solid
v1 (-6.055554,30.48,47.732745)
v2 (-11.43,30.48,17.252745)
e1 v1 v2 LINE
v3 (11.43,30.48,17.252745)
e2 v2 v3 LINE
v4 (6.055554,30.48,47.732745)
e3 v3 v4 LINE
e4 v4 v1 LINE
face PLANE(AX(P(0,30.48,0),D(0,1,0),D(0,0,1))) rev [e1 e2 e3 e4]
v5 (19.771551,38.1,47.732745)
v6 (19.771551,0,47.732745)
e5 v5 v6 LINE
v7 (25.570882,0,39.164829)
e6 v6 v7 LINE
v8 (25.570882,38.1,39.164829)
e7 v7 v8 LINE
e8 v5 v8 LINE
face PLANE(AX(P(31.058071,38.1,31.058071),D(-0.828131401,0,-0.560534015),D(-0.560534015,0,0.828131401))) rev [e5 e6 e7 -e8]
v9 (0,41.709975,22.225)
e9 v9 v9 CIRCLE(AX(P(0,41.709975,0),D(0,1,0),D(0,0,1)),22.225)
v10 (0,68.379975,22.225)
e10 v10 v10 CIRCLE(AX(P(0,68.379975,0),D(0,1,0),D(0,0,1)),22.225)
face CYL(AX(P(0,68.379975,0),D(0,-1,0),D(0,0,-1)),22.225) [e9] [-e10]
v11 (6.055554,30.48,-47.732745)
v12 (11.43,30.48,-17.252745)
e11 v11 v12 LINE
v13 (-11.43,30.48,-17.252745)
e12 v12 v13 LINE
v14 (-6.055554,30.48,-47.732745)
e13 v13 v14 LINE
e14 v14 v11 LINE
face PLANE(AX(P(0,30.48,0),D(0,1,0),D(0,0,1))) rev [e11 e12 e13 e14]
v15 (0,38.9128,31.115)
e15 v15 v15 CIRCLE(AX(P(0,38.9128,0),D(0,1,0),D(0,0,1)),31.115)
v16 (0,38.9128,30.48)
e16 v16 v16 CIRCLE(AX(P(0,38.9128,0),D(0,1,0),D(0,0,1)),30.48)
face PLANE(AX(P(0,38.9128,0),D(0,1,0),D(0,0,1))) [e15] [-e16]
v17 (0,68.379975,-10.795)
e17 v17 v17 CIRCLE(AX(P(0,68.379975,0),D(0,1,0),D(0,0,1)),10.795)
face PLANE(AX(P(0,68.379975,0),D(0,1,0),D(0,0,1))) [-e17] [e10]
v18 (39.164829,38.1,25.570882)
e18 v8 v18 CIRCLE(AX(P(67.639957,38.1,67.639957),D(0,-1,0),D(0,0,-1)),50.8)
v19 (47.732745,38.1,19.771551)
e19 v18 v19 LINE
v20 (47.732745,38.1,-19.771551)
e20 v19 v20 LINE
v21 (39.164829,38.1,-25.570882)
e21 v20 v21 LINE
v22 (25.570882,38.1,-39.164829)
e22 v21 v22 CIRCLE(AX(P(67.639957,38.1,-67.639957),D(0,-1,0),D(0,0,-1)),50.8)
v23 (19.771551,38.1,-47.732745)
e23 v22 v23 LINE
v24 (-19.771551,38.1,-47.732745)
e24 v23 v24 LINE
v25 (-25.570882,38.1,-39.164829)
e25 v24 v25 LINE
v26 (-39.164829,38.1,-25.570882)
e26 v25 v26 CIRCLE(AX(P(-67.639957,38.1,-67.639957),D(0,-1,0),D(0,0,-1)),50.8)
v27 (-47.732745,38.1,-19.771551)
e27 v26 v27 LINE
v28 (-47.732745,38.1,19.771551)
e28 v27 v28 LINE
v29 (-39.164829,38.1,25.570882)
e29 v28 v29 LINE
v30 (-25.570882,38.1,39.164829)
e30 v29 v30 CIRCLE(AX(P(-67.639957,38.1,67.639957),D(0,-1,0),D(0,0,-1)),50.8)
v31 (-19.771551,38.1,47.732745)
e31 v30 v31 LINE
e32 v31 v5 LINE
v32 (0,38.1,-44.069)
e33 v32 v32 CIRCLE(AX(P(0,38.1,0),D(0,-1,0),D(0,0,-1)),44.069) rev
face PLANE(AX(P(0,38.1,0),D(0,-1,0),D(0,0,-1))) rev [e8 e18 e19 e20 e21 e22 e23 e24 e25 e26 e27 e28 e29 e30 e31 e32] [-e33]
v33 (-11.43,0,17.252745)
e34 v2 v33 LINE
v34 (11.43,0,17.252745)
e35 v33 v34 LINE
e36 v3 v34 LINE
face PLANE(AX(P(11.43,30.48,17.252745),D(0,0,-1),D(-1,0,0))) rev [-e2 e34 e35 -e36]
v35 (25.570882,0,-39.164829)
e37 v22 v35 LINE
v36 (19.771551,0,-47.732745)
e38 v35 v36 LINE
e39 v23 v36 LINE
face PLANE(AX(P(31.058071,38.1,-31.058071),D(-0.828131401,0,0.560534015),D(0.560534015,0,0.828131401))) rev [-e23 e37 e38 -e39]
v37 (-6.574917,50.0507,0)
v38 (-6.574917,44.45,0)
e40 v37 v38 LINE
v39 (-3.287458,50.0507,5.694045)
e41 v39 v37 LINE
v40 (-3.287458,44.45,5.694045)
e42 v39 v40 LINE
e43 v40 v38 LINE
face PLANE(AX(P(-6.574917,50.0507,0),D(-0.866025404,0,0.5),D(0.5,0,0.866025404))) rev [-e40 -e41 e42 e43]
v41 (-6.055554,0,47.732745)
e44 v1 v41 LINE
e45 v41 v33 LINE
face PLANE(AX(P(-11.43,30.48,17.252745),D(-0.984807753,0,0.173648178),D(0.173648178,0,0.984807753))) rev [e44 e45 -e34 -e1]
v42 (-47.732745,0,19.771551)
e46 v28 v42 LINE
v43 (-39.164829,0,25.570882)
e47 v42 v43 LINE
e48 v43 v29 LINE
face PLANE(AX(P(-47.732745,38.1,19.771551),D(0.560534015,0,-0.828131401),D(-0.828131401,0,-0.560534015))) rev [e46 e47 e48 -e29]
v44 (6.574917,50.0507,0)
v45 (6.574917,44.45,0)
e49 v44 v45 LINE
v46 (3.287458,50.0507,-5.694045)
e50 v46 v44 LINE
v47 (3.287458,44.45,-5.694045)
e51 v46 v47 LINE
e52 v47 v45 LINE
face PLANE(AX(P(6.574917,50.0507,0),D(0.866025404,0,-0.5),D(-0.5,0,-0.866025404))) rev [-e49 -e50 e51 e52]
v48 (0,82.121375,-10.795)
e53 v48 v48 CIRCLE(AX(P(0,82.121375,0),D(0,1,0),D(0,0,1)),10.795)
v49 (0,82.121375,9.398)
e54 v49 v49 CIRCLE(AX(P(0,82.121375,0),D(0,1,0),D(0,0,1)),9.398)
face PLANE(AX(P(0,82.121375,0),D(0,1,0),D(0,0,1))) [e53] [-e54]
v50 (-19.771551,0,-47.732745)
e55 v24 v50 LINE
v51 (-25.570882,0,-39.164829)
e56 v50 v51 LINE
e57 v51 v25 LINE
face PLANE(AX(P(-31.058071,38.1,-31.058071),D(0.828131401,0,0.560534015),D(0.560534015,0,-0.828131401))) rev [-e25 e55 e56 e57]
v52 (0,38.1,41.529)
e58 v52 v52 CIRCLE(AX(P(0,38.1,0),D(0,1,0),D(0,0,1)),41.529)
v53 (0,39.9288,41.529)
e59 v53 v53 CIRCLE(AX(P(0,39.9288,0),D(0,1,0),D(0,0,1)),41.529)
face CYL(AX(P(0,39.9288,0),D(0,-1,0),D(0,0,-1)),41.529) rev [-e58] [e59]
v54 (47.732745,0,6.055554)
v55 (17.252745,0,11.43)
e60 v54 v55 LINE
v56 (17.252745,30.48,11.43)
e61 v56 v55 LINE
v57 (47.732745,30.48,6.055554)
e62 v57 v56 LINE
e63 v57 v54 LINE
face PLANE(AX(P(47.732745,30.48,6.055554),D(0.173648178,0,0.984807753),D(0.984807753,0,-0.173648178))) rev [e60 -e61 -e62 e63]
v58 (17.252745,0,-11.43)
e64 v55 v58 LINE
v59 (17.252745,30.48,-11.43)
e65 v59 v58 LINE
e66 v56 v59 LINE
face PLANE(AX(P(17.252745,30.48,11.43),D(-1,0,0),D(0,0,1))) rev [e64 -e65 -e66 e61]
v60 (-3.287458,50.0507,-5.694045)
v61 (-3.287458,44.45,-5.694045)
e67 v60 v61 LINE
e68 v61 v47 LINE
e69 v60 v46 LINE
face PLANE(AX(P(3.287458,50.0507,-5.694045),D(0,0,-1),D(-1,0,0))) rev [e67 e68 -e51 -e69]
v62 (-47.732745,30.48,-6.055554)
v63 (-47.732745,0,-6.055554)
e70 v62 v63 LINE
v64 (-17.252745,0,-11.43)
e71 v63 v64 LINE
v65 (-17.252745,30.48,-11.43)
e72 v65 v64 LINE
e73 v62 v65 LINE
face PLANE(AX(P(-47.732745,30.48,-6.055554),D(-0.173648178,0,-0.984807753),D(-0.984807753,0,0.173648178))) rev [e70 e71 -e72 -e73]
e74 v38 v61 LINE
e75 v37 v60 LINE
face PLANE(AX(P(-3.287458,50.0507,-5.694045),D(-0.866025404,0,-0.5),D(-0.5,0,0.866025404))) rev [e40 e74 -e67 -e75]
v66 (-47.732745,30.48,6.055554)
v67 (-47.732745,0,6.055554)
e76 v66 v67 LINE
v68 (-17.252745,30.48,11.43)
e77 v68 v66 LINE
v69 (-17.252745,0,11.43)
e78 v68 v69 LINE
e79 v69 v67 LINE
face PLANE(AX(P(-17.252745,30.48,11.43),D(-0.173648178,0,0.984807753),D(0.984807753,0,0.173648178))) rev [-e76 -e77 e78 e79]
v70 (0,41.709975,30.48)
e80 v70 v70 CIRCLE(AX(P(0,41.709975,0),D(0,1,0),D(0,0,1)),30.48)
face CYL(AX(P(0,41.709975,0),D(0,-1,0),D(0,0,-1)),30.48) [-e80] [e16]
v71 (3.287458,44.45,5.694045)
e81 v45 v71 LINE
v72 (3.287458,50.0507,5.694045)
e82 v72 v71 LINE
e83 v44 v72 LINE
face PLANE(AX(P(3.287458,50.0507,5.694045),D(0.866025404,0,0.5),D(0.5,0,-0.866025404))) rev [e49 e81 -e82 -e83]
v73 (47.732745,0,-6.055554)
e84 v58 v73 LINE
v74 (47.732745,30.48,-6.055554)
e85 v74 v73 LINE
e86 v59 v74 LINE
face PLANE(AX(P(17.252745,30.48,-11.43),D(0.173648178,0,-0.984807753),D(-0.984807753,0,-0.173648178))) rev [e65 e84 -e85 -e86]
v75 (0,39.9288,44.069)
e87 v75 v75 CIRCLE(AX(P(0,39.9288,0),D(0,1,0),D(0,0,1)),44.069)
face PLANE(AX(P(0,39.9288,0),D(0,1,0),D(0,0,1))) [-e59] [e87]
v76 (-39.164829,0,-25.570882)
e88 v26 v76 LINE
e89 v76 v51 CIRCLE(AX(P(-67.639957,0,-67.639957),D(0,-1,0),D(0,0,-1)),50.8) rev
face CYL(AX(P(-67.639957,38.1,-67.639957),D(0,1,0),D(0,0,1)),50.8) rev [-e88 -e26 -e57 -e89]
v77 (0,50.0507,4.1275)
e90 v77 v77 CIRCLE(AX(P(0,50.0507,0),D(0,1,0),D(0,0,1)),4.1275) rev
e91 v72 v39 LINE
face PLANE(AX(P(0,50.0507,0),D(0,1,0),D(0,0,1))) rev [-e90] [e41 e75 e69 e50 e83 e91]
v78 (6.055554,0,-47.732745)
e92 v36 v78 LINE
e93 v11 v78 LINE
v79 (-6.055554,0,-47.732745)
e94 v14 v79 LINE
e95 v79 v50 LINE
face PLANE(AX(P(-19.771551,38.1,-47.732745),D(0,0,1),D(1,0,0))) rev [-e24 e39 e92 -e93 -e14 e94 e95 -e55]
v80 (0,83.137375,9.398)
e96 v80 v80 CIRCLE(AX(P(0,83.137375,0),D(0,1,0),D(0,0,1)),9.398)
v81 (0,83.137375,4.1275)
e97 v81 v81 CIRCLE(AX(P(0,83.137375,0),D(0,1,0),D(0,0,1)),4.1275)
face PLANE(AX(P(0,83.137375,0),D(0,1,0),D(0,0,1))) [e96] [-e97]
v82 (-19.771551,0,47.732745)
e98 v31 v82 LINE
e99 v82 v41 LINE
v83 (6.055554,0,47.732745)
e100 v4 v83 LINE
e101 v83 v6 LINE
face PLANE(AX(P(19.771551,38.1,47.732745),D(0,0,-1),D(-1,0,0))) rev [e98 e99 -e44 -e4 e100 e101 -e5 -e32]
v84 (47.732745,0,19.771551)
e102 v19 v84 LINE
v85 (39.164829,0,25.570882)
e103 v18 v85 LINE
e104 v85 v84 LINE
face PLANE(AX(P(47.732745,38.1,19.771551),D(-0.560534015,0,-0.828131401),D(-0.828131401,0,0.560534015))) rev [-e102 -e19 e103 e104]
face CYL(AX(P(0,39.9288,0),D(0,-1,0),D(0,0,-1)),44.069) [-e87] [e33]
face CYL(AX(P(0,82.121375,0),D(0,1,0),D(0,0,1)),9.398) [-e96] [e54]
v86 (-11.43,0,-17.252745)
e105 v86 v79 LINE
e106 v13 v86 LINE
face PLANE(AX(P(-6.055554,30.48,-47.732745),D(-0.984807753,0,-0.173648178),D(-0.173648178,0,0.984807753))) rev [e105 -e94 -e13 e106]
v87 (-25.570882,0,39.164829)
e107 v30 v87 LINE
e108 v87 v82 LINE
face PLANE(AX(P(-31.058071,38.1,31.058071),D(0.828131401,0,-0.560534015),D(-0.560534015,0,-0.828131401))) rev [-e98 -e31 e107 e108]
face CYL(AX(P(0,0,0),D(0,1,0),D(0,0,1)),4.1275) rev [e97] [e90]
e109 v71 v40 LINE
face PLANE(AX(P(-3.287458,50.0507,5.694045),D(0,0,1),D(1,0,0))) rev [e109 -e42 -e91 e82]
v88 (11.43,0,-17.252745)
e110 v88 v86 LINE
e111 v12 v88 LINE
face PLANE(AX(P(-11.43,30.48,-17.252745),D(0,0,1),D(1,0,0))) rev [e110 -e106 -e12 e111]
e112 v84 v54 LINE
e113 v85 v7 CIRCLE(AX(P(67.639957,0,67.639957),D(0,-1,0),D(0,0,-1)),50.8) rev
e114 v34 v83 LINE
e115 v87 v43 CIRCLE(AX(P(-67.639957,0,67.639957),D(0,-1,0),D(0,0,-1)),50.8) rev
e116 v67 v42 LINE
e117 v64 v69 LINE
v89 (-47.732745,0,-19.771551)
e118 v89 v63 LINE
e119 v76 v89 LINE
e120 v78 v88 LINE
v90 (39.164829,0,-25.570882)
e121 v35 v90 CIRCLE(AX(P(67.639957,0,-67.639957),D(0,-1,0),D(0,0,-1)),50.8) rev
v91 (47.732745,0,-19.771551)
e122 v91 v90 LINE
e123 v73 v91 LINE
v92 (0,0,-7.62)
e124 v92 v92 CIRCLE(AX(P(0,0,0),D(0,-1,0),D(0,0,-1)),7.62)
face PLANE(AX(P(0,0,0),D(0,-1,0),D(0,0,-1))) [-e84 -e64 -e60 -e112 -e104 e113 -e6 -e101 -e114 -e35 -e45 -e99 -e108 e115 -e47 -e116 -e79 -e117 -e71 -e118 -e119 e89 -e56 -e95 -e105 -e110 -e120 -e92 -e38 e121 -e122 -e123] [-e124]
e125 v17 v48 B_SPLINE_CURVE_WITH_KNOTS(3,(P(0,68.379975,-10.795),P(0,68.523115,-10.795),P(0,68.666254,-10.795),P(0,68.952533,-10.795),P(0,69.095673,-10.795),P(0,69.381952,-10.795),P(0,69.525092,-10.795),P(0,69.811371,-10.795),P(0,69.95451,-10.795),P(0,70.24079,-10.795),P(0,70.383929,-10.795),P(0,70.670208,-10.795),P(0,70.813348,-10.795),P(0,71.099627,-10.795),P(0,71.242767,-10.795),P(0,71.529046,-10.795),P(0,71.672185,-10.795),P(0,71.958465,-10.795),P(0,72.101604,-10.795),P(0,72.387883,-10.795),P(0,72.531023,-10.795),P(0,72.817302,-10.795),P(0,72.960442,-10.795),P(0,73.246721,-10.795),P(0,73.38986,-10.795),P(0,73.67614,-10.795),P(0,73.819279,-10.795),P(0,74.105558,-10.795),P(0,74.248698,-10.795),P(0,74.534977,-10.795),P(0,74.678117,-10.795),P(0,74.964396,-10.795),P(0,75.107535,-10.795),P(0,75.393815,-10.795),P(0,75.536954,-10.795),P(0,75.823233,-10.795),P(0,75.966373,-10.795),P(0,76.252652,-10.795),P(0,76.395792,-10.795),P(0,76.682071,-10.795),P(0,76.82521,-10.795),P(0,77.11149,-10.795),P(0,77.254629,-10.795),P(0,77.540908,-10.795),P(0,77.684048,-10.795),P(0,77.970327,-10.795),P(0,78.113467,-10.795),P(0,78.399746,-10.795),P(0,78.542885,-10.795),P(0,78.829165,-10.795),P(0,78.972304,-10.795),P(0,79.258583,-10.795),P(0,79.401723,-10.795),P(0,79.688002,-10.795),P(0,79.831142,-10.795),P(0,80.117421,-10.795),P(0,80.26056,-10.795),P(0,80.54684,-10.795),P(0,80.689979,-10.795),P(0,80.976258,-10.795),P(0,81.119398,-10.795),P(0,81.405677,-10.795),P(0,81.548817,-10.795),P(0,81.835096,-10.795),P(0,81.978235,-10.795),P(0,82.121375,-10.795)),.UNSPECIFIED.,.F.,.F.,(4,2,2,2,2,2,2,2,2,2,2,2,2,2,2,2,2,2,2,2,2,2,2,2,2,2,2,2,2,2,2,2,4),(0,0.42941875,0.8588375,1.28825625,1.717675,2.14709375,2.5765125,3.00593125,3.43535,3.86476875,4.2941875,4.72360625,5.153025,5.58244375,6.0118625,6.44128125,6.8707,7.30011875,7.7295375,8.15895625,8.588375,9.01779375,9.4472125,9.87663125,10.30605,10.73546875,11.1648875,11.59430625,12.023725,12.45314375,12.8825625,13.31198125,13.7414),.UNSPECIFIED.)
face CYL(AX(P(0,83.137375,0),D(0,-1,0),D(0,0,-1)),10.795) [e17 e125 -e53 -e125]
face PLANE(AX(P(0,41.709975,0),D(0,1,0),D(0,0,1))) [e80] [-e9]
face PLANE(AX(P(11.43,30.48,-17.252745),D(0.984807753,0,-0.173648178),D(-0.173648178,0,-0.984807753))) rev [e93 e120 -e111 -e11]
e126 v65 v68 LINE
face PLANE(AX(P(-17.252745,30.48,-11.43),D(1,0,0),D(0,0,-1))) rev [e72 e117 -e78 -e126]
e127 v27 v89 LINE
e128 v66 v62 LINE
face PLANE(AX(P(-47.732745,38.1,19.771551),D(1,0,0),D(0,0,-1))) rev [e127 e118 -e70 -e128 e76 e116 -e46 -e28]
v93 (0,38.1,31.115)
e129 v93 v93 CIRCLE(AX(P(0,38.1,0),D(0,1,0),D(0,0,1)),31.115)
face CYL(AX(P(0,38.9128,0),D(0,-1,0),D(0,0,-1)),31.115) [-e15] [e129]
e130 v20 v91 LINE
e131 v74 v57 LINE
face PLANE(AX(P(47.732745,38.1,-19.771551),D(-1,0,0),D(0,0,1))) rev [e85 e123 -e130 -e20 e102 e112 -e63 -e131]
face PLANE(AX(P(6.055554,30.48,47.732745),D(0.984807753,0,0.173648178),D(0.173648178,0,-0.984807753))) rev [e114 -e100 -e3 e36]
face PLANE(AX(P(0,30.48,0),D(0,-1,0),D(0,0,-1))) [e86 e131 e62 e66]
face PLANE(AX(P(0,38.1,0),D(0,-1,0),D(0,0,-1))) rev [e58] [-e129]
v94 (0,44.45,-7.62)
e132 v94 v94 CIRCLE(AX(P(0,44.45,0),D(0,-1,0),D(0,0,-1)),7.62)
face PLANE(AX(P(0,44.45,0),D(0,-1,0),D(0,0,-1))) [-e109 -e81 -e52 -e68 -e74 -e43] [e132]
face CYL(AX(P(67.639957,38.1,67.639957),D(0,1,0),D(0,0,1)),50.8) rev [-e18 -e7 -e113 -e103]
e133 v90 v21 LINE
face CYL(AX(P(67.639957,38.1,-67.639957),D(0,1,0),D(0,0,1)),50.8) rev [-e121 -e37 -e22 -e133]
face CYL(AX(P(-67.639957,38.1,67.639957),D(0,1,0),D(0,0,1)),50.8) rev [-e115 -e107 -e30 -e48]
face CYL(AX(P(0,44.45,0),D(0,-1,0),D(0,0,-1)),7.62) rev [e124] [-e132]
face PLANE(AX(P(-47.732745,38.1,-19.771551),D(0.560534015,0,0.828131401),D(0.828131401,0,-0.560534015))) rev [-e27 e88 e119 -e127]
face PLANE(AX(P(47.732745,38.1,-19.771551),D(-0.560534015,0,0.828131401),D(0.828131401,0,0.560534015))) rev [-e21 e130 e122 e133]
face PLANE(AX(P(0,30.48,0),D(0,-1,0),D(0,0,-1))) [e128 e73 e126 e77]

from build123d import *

# Parameters (mm, degrees)
BASE_DEPTH                = 38.1
DOVETAIL_CUTS_DEPTH       = 30.48
SKETCH3_R                 = 31.115
LOWER_WASHER_LIP_DEPTH    = 0.8128
SKETCH4_R                 = 44.069
SKETCH4_R_2               = 41.529
RETAINING_LIP_DEPTH       = 1.8288
SKETCH6_R                 = 30.48
UPPER_BEARING_LIP_DEPTH   = 2.797175
SKETCH7_R                 = 22.225
CENTRAL_SHAFT_DEPTH       = 26.67
SKETCH5_R                 = 7.62
NUT_CLEARANCE_SHAFT_DEPTH = 44.45
SKETCH8_R                 = 10.795
THROUGH_SHAFT_DEPTH       = 14.7574
SKETCH9_R                 = 4.1275
THROUGH_HOLE_DEPTH        = 108.091797456
NUT_SLOT_DEPTH            = 5.6007
UPPER_START               = -1.016
SKETCH11_R                = 10.795
SKETCH11_R_2              = 9.398
UPPER_WASHER_LIP_DEPTH    = 1.016
FILLET2_R                 = 50.8


with BuildPart() as part:
    # Sketch1 → Base (new body)
    with BuildSketch(Plane(origin=(0, 0, 0), x_dir=(1, 0, 0), z_dir=(0, 1, 0))):
        Polygon((-47.732745366, -19.7715505), (-47.732745366, 19.7715505), (-31.058071097, 31.058071097), (-19.7715505, 47.732745366), (19.7715505, 47.732745366), (31.058071097, 31.058071097), (47.732745366, 19.7715505), (47.732745366, -19.7715505), (31.058071097, -31.058071097), (19.7715505, -47.732745366), (-19.7715505, -47.732745366), (-31.058071097, -31.058071097), align=None)
    extrude(amount=BASE_DEPTH)

    # Sketch2 → Dovetail cuts (cut)
    with BuildSketch(Plane.XZ):
        Polygon((6.055553628, -47.732745366), (-6.055553628, -47.732745366), (-11.43, -17.252745366), (11.43, -17.252745366), align=None)
        Polygon((-17.252745366, -11.43), (-17.252745366, 11.43), (-47.732745366, 6.055553628), (-47.732745366, -6.055553628), align=None)
        Polygon((17.252745366, 11.43), (17.252745366, -11.43), (47.732745366, -6.055553628), (47.732745366, 6.055553628), align=None)
        Polygon((6.055553628, 47.732745366), (11.43, 17.252745366), (-11.43, 17.252745366), (-6.055553628, 47.732745366), align=None)
    extrude(amount=-DOVETAIL_CUTS_DEPTH, mode=Mode.SUBTRACT)

    # Sketch3 → Lower washer lip (add)
    with BuildSketch(Plane(origin=(0, 38.1, 0), x_dir=(1, 0, 0), z_dir=(0, 1, 0))):
        with Locations(Location((0, 0, 0), (0, 0, 270))):
            Circle(SKETCH3_R)
    extrude(amount=LOWER_WASHER_LIP_DEPTH)

    # Sketch4 → Retaining lip (add)
    with BuildSketch(Plane(origin=(0, 38.1, 0), x_dir=(1, 0, 0), z_dir=(0, 1, 0))):
        with Locations(Location((0, 0, 0), (0, 0, 45.946261879))):
            Circle(SKETCH4_R)
        with Locations(Location((0, 0, 0), (0, 0, 270))):
            Circle(SKETCH4_R_2, mode=Mode.SUBTRACT)
    extrude(amount=RETAINING_LIP_DEPTH)

    # Sketch6 → Upper bearing lip (add)
    with BuildSketch(Plane(origin=(0, 38.9128, 0), x_dir=(1, 0, 0), z_dir=(0, 1, 0))):
        with Locations(Location((0, 0, 0), (0, 0, 270))):
            Circle(SKETCH6_R)
    extrude(amount=UPPER_BEARING_LIP_DEPTH)

    # Sketch7 → Central shaft (add)
    with BuildSketch(Plane(origin=(0, 41.709975, 0), x_dir=(1, 0, 0), z_dir=(0, 1, 0))):
        with Locations(Location((0, 0, 0), (0, 0, 270))):
            Circle(SKETCH7_R)
    extrude(amount=CENTRAL_SHAFT_DEPTH)

    # Sketch5 → Nut clearance shaft (cut)
    with BuildSketch(Plane.XZ):
        with Locations(Location((0, 0, 0), (0, 0, 270))):
            Circle(SKETCH5_R)
    extrude(amount=-NUT_CLEARANCE_SHAFT_DEPTH, mode=Mode.SUBTRACT)

    # Sketch8 → Through Shaft (add)
    with BuildSketch(Plane(origin=(0, 68.379975, 0), x_dir=(1, 0, 0), z_dir=(0, 1, 0))):
        with Locations(Location((0, 0, 0), (0, 0, 90))):
            Circle(SKETCH8_R)
    extrude(amount=THROUGH_SHAFT_DEPTH)

    # Sketch9 → Through Hole (cut, through all)
    with BuildSketch(Plane(origin=(0, 83.137375, 0), x_dir=(1, 0, 0), z_dir=(0, 1, 0))):
        with Locations(Location((0, 0, 0), (0, 0, 270))):
            Circle(SKETCH9_R)
    extrude(amount=-THROUGH_HOLE_DEPTH, mode=Mode.SUBTRACT)

    # Sketch10 → Nut slot (cut)
    with BuildSketch(Plane.XZ.offset(-44.45)):
        Polygon((3.287458414, 5.694045), (6.574916827, 0), (3.287458414, -5.694045), (-3.287458414, -5.694045), (-6.574916827, 0), (-3.287458414, 5.694045), align=None)
    extrude(amount=-NUT_SLOT_DEPTH, mode=Mode.SUBTRACT)

    # Sketch11 → Upper washer lip (cut)
    with BuildSketch(Plane(origin=(0, 83.137375, 0), x_dir=(1, 0, 0), z_dir=(0, 1, 0)).offset(UPPER_START)):
        with Locations(Location((0, 0, 0), (0, 0, 90))):
            Circle(SKETCH11_R)
        with Locations(Location((0, 0, 0), (0, 0, 270))):
            Circle(SKETCH11_R_2, mode=Mode.SUBTRACT)
    extrude(amount=UPPER_WASHER_LIP_DEPTH, mode=Mode.SUBTRACT)

    # Fillet2
    # the kernel refuses this fillet: 50.8 mm, written as the material it adds along each edge
    with BuildSketch(Plane(origin=(-31.058071097, 0, 31.058071097), x_dir=(-0.8281314013708309, 0, -0.5605340150816753), z_dir=(0, 1, 0)), Plane(origin=(31.058071097, 0, 31.058071097), x_dir=(-0.5605340150816742, 0, 0.8281314013708316), z_dir=(0, 1, 0))) as fillet2_piece_1:
        with BuildLine():
            CenterArc((FILLET2_R * 0.192701123769, FILLET2_R), FILLET2_R, 248.185472983, 21.814527017)
            Line((-FILLET2_R * 0.178902112104, FILLET2_R * 0.0716083611488), (0, 0))
            Line((0, 0), (FILLET2_R * 0.192701123769, 0))
        make_face()
    extrude(amount=38.1)
    with BuildSketch(Plane(origin=(-31.058071097, 0, -31.058071097), x_dir=(-0.8281314013708309, 0, 0.5605340150816753), z_dir=(0, 1, 0)), Plane(origin=(31.058071097, 0, -31.058071097), x_dir=(-0.5605340150816742, 0, -0.8281314013708316), z_dir=(0, 1, 0))) as fillet2_piece_2:
        with BuildLine():
            CenterArc((FILLET2_R * 0.192701123769, -FILLET2_R), FILLET2_R, 90, 21.814527017)
            Line((-FILLET2_R * 0.178902112104, -FILLET2_R * 0.0716083611488), (0, 0))
            Line((0, 0), (FILLET2_R * 0.192701123769, 0))
        make_face()
    extrude(amount=38.1)


solid = part.part
